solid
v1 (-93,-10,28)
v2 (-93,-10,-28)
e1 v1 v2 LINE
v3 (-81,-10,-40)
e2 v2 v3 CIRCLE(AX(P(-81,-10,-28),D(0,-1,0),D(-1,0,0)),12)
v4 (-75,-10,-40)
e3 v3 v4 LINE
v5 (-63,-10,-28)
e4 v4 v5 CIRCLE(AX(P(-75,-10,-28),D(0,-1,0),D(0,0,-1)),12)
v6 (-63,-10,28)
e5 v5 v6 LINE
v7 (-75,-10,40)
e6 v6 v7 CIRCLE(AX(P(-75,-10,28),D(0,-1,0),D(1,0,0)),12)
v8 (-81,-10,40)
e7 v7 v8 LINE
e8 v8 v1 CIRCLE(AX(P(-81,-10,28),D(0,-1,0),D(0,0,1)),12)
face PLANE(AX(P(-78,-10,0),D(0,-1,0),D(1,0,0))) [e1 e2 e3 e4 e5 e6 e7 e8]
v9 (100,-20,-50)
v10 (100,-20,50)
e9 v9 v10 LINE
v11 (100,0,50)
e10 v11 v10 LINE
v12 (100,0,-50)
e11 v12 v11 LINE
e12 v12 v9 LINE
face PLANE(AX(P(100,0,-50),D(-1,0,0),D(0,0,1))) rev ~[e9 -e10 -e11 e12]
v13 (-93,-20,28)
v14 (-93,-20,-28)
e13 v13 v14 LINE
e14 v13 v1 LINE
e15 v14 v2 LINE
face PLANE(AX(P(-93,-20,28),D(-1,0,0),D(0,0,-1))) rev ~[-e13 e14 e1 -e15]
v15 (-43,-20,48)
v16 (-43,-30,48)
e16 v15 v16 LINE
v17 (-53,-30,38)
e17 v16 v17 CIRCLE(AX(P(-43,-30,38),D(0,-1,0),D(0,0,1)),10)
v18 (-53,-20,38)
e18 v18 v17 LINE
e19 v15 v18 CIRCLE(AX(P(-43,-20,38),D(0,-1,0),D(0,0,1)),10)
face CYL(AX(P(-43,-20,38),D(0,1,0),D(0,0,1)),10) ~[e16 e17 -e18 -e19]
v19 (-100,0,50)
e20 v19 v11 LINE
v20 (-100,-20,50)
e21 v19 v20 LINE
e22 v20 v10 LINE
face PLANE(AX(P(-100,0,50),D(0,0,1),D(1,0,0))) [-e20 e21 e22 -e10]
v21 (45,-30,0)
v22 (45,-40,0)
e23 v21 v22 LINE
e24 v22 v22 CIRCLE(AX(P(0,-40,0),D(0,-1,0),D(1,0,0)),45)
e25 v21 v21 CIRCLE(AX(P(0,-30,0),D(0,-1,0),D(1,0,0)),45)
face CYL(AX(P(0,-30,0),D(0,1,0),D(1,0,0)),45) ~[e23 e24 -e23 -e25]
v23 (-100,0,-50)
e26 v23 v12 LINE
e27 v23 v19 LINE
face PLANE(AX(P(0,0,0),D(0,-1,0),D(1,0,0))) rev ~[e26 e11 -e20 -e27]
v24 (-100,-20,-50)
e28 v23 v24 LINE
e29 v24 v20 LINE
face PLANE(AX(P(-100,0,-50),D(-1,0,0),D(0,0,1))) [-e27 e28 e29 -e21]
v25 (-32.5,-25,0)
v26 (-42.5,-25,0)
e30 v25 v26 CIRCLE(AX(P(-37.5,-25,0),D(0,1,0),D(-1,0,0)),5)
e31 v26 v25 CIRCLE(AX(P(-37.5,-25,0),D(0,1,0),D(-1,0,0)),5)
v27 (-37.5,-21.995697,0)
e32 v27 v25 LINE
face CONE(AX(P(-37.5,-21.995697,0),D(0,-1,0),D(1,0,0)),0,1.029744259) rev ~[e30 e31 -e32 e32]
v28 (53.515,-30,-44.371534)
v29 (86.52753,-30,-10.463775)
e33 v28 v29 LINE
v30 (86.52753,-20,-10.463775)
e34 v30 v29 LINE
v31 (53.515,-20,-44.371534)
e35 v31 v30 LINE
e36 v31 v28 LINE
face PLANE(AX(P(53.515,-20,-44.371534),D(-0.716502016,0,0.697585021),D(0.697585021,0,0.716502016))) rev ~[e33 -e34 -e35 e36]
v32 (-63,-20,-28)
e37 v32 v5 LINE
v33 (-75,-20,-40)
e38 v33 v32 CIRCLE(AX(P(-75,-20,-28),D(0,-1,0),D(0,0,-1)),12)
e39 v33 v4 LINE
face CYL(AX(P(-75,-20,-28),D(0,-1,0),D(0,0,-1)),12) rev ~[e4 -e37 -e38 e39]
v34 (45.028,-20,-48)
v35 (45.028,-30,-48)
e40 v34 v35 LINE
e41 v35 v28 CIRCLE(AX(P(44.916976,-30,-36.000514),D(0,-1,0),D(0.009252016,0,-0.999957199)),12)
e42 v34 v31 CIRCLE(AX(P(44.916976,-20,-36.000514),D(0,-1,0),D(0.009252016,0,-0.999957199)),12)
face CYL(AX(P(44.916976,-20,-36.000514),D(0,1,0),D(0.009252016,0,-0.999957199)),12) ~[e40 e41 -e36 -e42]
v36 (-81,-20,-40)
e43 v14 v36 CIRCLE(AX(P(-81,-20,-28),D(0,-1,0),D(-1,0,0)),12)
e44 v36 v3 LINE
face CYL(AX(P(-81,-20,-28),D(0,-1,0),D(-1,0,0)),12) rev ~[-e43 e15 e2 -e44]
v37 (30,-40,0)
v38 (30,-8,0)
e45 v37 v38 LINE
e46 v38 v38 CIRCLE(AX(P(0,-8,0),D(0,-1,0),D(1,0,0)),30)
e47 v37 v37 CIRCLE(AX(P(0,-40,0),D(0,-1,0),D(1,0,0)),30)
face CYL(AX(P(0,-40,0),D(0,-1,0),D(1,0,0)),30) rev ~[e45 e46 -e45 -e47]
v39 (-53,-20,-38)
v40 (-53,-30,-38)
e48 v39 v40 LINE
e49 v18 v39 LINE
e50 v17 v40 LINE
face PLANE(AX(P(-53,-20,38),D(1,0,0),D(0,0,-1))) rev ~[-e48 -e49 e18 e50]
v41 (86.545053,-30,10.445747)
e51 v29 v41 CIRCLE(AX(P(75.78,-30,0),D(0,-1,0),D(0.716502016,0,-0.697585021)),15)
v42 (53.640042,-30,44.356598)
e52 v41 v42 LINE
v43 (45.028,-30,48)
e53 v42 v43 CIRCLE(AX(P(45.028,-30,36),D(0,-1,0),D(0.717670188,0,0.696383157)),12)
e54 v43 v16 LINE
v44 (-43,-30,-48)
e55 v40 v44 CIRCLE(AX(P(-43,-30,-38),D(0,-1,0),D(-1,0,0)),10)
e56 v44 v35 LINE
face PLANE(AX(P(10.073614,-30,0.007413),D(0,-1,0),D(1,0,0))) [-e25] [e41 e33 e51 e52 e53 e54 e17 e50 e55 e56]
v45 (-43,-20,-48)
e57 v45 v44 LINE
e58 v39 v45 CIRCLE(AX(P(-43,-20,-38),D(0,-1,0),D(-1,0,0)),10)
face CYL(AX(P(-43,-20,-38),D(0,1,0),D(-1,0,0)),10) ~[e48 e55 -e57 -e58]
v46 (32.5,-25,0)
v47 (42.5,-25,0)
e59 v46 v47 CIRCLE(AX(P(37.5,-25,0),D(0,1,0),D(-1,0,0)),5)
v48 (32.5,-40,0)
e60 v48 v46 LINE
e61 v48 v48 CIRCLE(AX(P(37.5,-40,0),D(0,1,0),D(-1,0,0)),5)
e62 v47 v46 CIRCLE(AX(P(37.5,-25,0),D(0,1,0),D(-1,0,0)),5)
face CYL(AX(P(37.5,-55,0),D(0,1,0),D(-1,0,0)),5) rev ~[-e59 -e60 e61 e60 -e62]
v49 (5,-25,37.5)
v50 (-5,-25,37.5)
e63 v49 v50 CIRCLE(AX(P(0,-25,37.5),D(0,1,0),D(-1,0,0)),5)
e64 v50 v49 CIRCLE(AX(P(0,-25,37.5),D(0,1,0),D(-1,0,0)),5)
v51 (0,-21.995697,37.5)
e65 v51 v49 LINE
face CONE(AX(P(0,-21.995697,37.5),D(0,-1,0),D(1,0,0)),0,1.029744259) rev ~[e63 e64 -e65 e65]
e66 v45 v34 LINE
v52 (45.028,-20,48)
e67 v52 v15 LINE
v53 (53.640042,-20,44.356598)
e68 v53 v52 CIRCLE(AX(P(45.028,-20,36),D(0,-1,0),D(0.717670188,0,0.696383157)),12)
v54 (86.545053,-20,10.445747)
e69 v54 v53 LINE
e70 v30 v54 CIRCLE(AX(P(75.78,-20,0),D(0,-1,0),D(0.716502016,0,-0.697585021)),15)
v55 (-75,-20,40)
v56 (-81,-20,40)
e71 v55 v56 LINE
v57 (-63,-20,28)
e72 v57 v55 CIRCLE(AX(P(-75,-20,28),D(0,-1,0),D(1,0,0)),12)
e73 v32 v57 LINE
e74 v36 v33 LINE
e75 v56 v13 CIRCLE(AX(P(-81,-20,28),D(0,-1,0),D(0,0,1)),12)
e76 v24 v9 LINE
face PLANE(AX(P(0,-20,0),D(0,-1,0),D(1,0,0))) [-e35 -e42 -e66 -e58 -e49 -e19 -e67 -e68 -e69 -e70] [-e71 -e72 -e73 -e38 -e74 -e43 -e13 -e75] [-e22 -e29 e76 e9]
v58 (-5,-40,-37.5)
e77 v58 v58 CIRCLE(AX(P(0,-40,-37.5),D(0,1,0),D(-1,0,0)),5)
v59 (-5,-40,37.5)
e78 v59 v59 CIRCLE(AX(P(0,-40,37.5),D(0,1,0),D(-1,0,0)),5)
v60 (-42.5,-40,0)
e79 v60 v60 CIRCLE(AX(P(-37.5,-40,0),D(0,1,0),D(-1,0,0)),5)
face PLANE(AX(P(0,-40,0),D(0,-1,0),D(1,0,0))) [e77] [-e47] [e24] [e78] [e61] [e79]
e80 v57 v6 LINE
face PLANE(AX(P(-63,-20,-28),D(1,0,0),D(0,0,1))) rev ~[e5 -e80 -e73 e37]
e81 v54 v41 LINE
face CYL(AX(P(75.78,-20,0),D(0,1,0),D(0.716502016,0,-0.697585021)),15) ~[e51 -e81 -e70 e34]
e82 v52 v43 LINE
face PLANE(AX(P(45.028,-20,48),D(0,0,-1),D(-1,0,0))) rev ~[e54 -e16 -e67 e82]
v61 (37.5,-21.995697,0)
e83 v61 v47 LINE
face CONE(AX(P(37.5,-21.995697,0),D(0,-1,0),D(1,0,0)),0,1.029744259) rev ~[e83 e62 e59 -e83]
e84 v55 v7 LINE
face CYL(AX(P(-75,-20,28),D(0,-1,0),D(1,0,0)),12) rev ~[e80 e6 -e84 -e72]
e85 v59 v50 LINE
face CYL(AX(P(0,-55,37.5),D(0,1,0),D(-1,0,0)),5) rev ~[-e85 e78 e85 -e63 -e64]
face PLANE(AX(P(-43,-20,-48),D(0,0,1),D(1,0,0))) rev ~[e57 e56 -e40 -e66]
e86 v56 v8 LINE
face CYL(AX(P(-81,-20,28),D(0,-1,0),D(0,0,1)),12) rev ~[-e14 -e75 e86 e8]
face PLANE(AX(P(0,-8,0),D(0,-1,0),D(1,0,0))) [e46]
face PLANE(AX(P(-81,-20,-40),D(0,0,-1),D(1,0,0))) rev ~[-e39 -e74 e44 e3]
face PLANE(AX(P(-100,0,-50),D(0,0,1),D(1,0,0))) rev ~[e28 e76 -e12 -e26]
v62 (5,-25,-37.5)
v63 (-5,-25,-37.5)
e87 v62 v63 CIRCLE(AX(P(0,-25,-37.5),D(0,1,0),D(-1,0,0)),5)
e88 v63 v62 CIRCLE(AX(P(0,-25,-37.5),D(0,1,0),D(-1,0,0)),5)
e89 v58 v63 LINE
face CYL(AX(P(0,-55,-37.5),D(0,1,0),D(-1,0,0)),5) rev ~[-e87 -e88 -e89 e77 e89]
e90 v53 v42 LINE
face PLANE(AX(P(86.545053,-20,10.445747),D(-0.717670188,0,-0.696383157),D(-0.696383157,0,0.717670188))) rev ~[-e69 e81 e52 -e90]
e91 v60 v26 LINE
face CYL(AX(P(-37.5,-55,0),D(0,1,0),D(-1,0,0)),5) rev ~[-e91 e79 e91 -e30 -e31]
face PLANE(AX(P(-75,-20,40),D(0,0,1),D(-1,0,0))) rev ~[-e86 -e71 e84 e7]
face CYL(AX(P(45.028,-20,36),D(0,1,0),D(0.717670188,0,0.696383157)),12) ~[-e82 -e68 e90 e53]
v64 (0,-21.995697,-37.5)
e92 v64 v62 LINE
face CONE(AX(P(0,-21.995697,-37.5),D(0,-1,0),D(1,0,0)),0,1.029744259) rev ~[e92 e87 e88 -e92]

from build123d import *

# Parameters (mm, degrees)
F0_W      = 200
F0_H      = 100
F1_DEPTH  = 20
F3_DEPTH  = 10
F5_DEPTH  = 10
F6_R      = 45
F7_DEPTH  = 10
F8_R      = 30
F9_DEPTH  = 32
F11_D     = 10
F11_DEPTH = 15
F11_TIP   = 3.0043030951


# Not quite as in the source:
# - a feature names something its author has since deleted; it is built from what else it names


with BuildPart() as f1:
    # F0 (on Front) → F1 (new body)
    with BuildSketch(Plane.XZ):
        Rectangle(F0_W, F0_H)
    extrude(amount=F1_DEPTH)

    # F2 (on face) → F3 (cut)
    with BuildSketch(Plane.XZ.offset(20)):
        with BuildLine():
            Line((-75, 40), (-81, 40))
            ThreePointArc((-81, 40), (-89.4852813742, 36.4852813742), (-93, 28))
            Line((-93, 28), (-93, -28))
            ThreePointArc((-93, -28), (-89.4852813742, -36.4852813742), (-81, -40))
            Line((-81, -40), (-75, -40))
            ThreePointArc((-75, -40), (-66.5147186258, -36.4852813742), (-63, -28))
            Line((-63, -28), (-63, 28))
            ThreePointArc((-63, 28), (-66.5147186258, 36.4852813742), (-75, 40))
        make_face()
    extrude(amount=-F3_DEPTH, mode=Mode.SUBTRACT)

    # F4 (on face) → F5 (join)
    with BuildSketch(Plane.XZ.offset(20)):
        with BuildLine():
            Line((45.028, 48), (-43, 48))
            ThreePointArc((-43, 48), (-50.0710678119, 45.0710678119), (-53, 38))
            Line((-53, 38), (-53, -38))
            ThreePointArc((-53, -38), (-50.0710678119, -45.0710678119), (-43, -48))
            Line((-43, -48), (45.028, -48))
            ThreePointArc((45.028, -48), (49.6343185527, -47.0344012956), (53.515, -44.3715338615))
            Line((53.515, -44.3715338615), (86.5275302355, -10.4637753147))
            ThreePointArc((86.5275302355, -10.4637753147), (90.7799947329, -0.0125702902), (86.5450528262, 10.4457473475))
            Line((86.5450528262, 10.4457473475), (53.640042261, 44.356597878))
            ThreePointArc((53.640042261, 44.356597878), (49.7035120288, 47.0516780295), (45.028, 48))
        make_face()
    extrude(amount=F5_DEPTH)

    # F6 (on face) → F7 (join)
    with BuildSketch(Plane.XZ.offset(30)):
        Circle(F6_R)
    extrude(amount=F7_DEPTH)

    # F8 (on face) → F9 (cut)
    with BuildSketch(Plane.XZ.offset(40)):
        Circle(F8_R)
    extrude(amount=-F9_DEPTH, mode=Mode.SUBTRACT)

    # F11
    with Locations(Plane.XZ.offset(40)):
        with Locations((-37.5, 0), (0, 37.5), (37.5, 0), (0, -37.5)):
            Hole(F11_D / 2, depth=F11_DEPTH)
            with Locations((0, 0, -(F11_DEPTH + F11_TIP / 2))):  # 118° drill point
                Cone(0, F11_D / 2, F11_TIP, mode=Mode.SUBTRACT)


solid = f1.part
